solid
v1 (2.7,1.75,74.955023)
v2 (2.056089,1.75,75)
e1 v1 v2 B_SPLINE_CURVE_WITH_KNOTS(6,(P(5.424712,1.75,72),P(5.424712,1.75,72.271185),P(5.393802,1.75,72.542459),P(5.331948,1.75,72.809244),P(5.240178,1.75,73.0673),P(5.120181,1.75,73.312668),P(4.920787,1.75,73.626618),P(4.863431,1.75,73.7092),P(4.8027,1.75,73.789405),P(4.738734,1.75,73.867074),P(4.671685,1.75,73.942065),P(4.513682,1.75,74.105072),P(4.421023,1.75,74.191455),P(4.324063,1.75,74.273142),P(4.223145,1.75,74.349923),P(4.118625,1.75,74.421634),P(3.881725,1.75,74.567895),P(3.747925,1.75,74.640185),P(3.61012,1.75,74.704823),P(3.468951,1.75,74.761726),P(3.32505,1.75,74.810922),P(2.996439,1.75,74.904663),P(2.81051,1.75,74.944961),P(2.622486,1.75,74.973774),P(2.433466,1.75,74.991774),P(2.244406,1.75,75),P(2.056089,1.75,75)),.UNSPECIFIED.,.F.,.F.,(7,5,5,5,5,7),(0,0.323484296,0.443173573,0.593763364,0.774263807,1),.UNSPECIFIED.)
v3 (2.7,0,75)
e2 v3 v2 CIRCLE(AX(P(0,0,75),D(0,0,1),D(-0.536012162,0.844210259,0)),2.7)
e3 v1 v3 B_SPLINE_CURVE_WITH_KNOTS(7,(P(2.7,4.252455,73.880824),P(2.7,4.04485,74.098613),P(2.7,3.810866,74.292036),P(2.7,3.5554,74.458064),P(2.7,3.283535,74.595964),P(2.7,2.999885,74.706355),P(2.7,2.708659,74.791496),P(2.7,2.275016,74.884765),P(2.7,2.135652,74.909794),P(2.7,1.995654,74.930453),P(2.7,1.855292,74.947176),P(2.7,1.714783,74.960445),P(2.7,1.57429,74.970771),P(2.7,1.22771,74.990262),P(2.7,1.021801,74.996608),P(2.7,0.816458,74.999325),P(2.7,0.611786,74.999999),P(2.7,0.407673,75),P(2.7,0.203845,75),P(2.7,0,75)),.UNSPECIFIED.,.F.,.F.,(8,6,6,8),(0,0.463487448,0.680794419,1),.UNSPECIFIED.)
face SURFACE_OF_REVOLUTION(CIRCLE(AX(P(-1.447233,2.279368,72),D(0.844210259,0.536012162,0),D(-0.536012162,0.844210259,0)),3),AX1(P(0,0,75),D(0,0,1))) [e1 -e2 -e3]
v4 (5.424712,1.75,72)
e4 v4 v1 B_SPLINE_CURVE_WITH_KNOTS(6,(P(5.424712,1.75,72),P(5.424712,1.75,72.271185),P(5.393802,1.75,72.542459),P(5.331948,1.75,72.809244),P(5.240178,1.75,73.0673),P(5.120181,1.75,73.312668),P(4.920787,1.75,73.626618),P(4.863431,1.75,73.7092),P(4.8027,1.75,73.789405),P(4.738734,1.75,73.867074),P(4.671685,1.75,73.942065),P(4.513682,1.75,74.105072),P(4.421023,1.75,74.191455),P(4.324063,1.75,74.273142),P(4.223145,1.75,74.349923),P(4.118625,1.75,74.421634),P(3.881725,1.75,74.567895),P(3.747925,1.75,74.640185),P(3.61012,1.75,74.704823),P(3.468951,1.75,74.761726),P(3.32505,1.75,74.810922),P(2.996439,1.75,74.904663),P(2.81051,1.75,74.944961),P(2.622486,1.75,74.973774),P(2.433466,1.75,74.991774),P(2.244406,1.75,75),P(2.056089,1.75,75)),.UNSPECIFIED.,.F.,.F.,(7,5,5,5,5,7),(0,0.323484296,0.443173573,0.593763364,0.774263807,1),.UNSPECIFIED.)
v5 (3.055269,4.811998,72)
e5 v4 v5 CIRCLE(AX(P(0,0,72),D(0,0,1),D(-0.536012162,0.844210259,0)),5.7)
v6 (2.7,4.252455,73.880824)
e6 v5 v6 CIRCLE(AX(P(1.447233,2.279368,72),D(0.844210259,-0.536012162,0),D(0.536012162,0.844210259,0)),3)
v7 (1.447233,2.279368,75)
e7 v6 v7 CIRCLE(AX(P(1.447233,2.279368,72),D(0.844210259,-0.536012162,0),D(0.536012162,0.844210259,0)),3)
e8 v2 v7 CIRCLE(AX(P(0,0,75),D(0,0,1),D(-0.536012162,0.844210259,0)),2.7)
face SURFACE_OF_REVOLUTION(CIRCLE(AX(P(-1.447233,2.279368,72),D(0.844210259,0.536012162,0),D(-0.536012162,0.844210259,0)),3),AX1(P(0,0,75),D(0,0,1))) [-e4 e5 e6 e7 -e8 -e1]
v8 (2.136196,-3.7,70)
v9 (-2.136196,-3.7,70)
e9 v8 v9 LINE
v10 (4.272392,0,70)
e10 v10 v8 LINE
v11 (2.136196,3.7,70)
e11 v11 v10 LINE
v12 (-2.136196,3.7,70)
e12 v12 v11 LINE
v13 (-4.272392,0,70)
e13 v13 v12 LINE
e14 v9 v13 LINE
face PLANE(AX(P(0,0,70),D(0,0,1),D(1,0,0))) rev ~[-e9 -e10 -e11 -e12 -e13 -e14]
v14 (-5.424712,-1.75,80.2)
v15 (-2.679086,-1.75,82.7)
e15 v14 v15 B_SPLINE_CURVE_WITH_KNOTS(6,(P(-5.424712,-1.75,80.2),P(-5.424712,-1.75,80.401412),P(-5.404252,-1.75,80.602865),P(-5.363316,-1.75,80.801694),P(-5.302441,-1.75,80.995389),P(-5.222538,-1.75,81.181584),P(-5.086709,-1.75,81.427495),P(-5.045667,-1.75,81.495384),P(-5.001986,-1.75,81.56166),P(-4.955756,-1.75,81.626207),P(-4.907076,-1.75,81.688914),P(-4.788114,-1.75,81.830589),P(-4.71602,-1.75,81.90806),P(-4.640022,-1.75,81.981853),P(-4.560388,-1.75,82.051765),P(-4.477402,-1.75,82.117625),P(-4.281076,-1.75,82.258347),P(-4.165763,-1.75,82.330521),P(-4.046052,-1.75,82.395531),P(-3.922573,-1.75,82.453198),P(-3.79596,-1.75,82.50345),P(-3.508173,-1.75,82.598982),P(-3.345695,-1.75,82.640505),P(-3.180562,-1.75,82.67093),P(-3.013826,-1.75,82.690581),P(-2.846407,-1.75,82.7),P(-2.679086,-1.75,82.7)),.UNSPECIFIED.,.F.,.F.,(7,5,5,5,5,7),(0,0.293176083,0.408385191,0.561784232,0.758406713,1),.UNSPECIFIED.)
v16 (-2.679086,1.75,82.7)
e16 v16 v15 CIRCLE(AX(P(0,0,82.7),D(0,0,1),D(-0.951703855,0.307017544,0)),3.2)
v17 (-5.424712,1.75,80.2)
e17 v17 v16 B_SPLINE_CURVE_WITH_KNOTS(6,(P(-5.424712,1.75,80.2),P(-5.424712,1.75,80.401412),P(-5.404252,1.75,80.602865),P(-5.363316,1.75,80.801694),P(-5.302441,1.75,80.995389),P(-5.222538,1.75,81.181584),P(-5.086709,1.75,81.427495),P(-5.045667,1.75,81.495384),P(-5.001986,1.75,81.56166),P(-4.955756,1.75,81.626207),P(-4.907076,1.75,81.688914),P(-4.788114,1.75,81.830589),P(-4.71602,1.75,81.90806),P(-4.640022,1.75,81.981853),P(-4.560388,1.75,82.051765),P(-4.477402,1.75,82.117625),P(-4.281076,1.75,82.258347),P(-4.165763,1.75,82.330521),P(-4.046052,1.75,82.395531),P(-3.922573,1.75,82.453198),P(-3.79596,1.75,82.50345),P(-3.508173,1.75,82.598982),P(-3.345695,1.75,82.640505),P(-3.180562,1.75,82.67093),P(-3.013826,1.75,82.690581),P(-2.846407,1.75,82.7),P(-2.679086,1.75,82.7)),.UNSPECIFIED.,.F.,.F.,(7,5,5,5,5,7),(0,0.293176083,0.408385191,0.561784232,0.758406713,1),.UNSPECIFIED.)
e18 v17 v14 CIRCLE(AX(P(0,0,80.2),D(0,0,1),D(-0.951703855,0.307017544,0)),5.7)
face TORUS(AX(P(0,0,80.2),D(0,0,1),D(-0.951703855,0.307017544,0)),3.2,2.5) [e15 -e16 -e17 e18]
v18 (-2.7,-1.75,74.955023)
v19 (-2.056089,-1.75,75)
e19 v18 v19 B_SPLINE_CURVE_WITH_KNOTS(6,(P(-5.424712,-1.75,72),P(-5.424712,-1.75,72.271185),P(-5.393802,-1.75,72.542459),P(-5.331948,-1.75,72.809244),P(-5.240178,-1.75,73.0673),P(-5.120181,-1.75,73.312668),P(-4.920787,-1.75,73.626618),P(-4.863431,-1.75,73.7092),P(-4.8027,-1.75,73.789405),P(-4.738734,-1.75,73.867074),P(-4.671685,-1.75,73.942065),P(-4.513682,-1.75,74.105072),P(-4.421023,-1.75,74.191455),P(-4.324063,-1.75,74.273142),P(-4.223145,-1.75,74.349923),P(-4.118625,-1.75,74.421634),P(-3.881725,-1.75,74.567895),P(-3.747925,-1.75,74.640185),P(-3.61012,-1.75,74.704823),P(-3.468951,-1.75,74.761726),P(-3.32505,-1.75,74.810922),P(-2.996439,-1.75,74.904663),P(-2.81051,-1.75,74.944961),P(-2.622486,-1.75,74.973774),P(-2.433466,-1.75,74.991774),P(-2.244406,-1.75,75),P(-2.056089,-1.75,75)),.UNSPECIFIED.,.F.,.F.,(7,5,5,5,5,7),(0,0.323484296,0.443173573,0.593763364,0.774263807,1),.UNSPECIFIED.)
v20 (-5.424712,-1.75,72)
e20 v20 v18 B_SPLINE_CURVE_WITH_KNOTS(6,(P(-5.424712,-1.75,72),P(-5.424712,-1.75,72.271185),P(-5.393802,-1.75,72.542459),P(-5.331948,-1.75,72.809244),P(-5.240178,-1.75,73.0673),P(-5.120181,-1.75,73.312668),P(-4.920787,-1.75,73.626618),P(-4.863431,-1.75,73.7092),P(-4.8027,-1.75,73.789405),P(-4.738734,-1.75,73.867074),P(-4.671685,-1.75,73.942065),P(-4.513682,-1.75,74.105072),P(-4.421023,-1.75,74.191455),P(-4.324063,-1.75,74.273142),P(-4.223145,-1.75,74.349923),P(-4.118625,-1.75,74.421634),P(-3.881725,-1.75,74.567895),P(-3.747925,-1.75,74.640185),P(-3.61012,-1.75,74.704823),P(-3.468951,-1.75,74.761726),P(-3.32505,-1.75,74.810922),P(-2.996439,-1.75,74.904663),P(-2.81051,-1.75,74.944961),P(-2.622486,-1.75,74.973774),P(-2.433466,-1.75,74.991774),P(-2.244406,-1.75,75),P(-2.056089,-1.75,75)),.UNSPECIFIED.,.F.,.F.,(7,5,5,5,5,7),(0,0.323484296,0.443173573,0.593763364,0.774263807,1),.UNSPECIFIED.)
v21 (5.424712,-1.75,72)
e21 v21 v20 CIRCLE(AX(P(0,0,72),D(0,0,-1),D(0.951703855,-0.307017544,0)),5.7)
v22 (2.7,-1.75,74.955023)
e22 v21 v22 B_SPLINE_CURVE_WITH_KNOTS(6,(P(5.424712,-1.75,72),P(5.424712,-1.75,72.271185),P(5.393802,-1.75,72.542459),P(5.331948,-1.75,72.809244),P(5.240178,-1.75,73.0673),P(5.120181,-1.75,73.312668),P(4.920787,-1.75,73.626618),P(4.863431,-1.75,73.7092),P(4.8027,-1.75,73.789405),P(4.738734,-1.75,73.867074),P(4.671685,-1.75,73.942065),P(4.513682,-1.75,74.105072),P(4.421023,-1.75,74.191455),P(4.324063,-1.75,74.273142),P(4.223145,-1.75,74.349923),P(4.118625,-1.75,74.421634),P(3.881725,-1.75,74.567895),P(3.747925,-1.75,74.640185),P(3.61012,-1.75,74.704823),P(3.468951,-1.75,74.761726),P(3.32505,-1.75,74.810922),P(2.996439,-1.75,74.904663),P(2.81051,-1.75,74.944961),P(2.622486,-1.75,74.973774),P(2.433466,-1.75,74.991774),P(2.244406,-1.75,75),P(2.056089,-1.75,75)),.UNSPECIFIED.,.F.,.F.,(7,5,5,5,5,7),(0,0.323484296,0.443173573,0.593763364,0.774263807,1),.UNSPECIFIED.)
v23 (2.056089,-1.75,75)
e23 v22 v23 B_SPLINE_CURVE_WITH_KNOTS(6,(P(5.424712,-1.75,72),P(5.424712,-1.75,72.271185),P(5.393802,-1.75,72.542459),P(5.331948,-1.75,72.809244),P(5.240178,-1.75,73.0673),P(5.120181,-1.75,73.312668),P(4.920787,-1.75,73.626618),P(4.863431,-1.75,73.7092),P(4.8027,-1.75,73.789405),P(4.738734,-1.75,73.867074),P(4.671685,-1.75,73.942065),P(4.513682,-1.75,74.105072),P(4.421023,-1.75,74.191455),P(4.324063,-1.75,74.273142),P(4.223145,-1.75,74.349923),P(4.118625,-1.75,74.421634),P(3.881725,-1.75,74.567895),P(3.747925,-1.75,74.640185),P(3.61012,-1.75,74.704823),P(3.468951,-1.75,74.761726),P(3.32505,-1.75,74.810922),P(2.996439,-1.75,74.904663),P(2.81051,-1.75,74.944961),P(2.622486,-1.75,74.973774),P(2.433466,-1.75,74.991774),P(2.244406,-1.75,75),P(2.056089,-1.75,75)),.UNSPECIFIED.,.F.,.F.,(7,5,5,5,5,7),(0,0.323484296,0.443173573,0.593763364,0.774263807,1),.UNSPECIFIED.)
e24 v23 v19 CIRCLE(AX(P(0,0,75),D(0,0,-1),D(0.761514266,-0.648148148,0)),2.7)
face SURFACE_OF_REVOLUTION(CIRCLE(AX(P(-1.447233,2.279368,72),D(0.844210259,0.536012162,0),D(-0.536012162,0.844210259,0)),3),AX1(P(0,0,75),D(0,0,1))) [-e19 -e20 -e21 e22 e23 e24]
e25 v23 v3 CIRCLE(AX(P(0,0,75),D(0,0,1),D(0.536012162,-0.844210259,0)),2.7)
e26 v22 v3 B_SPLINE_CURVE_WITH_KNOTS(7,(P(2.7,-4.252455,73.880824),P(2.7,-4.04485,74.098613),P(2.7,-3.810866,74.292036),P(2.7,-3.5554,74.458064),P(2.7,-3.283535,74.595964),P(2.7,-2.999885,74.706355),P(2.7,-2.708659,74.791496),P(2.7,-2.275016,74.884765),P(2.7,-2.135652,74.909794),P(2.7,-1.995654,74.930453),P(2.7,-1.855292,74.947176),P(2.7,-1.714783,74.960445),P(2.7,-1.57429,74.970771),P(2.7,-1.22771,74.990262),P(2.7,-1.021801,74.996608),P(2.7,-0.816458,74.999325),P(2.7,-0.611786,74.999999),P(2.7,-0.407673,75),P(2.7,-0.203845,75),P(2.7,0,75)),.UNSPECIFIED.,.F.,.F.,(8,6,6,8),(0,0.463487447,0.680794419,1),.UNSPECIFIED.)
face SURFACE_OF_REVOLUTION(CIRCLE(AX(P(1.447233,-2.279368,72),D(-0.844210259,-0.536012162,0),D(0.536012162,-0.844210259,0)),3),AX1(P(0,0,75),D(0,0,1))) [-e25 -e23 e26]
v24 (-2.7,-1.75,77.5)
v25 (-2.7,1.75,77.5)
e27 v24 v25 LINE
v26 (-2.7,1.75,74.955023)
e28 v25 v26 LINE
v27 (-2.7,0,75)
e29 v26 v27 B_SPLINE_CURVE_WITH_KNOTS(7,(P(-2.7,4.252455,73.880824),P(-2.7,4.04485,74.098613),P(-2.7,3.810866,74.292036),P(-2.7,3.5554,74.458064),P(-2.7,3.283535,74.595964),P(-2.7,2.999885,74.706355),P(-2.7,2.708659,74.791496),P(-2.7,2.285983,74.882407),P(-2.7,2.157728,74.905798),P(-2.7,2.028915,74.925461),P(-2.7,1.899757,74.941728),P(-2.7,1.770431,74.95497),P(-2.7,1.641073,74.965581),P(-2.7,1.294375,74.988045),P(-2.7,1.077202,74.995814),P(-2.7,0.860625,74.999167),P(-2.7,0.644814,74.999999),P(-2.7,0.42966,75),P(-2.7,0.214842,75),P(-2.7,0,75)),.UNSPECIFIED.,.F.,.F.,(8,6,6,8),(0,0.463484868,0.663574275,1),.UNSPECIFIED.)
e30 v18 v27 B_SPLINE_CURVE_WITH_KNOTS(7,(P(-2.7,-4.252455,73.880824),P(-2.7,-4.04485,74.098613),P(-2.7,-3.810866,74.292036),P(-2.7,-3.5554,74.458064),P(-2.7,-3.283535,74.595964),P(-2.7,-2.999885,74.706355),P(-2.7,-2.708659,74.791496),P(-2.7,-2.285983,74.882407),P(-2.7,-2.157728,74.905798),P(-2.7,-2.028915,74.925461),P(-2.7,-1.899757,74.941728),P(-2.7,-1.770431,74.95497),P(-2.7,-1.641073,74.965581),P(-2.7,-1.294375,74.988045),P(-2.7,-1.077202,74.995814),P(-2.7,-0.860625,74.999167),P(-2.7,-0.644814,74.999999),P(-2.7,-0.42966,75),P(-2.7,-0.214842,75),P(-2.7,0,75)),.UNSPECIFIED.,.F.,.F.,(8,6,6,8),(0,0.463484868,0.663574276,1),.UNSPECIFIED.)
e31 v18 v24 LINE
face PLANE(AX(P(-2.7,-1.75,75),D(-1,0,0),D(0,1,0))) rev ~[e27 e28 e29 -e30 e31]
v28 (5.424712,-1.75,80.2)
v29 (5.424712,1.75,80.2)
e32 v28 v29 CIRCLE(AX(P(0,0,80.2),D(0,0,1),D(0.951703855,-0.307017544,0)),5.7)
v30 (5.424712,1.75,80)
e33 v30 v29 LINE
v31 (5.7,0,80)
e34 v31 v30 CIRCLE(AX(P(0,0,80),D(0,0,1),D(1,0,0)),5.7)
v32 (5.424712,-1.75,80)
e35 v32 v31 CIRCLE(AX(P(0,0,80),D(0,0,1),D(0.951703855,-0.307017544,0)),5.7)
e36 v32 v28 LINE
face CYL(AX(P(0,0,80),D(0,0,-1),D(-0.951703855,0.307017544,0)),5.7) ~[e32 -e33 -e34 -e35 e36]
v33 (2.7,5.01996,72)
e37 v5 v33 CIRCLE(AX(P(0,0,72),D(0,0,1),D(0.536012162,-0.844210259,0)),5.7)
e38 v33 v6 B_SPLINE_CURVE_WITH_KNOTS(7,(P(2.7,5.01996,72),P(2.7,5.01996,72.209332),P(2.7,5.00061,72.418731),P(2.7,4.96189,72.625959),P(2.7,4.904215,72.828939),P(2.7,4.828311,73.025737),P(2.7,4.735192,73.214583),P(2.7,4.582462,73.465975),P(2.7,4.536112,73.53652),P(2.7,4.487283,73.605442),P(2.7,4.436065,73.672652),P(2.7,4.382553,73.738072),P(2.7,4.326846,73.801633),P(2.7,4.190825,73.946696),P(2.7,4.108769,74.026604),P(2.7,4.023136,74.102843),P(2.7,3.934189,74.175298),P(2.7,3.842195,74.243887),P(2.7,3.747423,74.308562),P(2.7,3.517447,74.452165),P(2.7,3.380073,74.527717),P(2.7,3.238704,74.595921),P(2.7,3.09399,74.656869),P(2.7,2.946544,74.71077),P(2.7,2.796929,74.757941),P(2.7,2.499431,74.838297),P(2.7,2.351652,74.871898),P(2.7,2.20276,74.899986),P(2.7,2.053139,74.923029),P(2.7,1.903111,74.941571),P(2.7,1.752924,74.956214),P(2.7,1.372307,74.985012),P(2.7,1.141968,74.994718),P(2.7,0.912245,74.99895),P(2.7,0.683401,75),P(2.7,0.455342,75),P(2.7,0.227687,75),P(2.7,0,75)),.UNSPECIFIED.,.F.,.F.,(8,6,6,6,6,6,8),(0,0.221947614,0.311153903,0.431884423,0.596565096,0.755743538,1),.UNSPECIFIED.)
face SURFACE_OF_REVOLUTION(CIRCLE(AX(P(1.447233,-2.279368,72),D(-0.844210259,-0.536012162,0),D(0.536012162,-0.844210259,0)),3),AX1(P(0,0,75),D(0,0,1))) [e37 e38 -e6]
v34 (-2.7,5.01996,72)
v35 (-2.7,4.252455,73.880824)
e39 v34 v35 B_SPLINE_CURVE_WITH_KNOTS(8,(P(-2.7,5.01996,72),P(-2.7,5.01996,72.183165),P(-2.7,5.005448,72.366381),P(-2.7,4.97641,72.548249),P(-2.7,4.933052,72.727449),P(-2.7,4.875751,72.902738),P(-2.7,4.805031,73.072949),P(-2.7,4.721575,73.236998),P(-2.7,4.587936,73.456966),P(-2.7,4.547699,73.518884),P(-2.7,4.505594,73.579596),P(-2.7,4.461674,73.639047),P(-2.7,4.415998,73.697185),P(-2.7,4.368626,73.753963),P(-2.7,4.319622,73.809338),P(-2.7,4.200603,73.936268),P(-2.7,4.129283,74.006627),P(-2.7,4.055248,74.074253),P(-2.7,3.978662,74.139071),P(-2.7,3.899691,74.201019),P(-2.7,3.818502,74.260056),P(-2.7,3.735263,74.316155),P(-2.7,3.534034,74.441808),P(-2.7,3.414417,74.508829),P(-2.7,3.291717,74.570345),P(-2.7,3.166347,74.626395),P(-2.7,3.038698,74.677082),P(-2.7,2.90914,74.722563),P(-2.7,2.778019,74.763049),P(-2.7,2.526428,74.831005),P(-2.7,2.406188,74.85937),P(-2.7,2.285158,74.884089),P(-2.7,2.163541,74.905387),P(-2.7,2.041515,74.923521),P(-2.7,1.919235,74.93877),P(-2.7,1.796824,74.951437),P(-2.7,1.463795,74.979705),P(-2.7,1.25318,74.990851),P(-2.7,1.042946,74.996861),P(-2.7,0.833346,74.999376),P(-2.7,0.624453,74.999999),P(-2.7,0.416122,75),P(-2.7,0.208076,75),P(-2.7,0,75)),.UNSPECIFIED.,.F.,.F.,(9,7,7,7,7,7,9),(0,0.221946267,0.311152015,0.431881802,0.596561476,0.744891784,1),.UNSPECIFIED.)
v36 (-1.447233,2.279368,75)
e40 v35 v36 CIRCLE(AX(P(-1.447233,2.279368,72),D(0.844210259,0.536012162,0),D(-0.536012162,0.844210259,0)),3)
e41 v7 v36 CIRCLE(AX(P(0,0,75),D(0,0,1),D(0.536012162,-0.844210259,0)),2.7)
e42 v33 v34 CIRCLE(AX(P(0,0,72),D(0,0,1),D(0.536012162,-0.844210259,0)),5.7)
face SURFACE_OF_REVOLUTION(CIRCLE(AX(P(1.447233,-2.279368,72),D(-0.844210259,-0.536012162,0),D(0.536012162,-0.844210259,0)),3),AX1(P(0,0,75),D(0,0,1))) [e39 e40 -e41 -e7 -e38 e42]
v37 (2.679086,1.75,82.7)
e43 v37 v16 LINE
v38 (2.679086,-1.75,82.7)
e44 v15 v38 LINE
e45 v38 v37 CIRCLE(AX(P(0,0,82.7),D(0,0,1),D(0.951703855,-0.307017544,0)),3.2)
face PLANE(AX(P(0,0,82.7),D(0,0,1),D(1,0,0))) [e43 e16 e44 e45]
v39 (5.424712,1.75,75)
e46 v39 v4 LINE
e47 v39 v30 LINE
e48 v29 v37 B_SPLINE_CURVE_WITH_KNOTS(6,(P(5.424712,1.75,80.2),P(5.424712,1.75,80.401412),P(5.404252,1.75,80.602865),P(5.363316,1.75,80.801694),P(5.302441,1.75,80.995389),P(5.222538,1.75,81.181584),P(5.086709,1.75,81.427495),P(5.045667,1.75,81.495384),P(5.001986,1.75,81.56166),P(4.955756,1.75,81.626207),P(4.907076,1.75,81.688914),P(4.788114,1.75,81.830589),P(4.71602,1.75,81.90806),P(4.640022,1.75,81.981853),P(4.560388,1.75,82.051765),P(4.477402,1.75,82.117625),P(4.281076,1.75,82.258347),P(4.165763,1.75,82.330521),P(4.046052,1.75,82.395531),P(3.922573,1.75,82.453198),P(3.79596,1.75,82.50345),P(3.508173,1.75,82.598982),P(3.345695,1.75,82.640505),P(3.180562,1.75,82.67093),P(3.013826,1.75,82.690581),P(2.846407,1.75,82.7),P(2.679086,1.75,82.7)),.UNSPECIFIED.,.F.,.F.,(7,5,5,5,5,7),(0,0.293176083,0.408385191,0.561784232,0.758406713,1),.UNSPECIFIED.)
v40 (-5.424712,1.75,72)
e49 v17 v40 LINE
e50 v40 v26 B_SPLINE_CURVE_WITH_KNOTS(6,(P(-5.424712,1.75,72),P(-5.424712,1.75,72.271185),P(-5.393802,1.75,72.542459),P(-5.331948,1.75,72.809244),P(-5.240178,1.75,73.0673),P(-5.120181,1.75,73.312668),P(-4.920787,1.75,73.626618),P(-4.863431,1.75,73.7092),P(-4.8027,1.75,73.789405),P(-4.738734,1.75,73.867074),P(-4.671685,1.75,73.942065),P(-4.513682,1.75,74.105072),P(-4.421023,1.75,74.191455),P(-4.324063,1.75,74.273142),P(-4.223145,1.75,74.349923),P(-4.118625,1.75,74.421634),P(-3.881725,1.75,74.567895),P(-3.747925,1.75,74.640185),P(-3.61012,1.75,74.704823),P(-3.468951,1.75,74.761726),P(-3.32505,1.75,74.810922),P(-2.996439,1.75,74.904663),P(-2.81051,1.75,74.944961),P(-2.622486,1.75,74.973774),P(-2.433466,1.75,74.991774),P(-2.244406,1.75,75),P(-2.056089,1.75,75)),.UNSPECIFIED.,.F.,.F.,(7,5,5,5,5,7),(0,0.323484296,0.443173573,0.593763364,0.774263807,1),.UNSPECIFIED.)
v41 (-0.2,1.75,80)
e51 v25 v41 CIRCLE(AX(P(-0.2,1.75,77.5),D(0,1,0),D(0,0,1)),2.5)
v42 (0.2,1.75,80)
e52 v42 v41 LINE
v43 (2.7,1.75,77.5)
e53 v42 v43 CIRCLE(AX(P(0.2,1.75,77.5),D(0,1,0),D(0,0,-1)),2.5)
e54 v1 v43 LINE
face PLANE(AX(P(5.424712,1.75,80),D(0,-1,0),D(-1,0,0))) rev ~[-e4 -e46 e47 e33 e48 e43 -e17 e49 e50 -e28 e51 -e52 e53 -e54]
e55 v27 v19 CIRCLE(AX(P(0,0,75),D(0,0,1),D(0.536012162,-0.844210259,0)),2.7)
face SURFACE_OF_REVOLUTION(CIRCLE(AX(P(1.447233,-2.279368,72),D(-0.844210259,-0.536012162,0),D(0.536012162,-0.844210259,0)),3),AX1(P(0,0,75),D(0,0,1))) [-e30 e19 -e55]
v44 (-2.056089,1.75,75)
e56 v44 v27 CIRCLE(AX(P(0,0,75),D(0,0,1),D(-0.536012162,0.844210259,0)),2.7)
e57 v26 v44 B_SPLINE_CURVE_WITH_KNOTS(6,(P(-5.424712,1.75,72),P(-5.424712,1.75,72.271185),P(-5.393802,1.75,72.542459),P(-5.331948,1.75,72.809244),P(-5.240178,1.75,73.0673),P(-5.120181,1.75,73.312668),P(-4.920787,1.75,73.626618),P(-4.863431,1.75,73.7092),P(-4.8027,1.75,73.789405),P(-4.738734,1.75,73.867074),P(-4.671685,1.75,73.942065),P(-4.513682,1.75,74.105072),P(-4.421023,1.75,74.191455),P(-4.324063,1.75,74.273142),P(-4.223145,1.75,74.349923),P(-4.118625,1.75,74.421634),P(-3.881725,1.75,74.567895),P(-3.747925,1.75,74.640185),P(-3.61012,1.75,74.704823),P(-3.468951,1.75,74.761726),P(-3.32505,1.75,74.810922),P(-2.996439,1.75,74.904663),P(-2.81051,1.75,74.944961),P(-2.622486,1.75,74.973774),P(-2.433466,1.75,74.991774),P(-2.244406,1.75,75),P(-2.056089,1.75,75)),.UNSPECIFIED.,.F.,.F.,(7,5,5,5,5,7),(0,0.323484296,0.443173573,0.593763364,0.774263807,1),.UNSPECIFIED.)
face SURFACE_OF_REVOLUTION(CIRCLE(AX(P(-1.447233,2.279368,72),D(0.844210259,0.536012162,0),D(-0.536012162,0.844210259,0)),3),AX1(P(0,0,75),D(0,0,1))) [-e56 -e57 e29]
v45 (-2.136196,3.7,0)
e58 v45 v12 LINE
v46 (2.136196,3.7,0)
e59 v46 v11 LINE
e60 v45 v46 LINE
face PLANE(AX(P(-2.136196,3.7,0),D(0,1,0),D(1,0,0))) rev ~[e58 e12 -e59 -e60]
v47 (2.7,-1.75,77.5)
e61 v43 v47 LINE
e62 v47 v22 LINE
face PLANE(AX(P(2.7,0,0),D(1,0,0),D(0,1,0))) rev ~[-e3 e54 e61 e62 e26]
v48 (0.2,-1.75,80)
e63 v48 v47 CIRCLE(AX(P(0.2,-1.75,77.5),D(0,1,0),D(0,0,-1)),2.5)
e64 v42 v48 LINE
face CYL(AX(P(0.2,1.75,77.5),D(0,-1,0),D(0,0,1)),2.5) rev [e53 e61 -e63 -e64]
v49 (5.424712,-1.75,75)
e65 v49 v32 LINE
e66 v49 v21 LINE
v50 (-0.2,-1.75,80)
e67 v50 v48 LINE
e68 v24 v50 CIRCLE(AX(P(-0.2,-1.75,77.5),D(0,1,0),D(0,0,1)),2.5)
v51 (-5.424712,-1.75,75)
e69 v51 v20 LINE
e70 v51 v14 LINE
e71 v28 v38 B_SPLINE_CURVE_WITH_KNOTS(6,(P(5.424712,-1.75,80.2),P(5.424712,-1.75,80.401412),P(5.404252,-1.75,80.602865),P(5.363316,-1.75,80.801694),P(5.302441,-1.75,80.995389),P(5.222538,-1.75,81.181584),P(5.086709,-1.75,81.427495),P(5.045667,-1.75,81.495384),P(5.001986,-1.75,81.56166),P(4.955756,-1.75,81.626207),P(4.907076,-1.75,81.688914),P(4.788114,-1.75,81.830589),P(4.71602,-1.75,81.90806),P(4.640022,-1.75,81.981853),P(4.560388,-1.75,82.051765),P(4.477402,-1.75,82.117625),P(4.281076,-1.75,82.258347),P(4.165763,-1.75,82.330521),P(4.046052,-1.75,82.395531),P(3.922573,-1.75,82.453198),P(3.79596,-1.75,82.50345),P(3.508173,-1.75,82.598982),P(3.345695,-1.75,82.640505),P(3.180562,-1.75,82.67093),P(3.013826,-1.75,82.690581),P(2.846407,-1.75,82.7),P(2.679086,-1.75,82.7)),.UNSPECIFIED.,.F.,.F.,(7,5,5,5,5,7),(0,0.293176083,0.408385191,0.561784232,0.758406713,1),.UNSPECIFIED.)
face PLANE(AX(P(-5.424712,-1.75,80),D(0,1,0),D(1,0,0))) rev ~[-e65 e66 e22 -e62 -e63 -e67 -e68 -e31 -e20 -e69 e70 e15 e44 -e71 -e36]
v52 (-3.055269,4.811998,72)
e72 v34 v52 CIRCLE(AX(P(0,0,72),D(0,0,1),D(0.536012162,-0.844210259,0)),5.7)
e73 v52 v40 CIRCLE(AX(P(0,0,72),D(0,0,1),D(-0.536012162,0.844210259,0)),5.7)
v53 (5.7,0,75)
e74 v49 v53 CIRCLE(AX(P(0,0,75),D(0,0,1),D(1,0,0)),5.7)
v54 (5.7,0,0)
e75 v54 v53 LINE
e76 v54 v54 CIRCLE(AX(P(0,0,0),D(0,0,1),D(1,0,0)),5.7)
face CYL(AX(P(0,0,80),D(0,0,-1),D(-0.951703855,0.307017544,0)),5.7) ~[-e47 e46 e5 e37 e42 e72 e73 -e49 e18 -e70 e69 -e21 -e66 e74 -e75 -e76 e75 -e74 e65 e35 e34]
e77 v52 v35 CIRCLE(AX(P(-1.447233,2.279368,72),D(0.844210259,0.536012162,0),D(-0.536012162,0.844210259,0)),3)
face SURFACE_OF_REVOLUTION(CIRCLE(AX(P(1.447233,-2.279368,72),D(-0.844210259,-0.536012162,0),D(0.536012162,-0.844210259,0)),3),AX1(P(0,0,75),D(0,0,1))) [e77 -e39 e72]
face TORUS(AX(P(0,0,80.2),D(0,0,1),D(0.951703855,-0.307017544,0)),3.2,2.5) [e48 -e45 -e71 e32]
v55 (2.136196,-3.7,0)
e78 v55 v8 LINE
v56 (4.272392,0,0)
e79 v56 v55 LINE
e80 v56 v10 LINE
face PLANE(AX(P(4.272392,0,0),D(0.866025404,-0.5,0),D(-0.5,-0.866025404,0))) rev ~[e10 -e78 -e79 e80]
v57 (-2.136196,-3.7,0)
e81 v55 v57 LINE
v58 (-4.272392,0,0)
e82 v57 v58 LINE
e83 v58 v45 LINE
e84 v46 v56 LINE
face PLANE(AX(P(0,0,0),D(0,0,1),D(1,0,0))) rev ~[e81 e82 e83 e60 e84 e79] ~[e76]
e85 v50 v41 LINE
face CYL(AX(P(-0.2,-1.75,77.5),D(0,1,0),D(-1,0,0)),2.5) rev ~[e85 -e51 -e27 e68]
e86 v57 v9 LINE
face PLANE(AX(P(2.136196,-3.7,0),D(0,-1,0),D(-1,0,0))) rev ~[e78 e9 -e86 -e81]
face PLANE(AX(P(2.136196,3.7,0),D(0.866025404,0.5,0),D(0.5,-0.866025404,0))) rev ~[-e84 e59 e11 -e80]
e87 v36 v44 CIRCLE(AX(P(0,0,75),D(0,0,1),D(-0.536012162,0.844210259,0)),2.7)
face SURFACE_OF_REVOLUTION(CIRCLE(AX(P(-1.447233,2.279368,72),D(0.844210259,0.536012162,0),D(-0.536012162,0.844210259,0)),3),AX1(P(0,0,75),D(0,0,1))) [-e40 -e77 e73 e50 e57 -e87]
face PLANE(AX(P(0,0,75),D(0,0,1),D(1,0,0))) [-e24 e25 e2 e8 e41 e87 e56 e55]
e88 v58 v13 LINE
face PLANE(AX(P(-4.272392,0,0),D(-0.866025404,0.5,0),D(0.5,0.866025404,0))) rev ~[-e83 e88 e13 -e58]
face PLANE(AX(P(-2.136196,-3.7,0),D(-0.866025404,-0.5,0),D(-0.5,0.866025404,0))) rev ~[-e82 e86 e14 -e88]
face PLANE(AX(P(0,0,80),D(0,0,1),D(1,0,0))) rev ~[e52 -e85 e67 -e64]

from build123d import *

# Parameters (mm, degrees)
F0_R         = 5.7
F1_DEPTH     = 70
F2_R         = 5.7
F3_DEPTH     = 5
F5_DEPTH     = 5
F6_W         = 5.4
F6_H         = 3.5
F7_DEPTH     = 2.7
F8_R         = 2.5
F9_T4_ANGLE  = 295.1748403761
F9_T9_ANGLE  = 295.1748403761
F9_T15_ANGLE = 295.1748403761
F9_T20_ANGLE = 295.1748403761
F9_T25_ANGLE = 295.1748403761
F9_T31_ANGLE = 295.1748403761


# Not quite as in the source:
# - a fillet or chamfer that OpenCascade refuses, or shapes differently, is made with other operations: its cross-section is extruded or revolved along the edge and cut away or added


with BuildPart() as f1:
    # F0 (on Top) → F1 (new body)
    with BuildSketch(Plane.XY):
        Circle(F0_R)
        Polygon((-2.136195996, -3.7), (-4.272391992, 0), (-2.136195996, 3.7), (2.136195996, 3.7), (4.272391992, 0), (2.136195996, -3.7), align=None, mode=Mode.SUBTRACT)
    extrude(amount=F1_DEPTH)

    # F2 (on face) → F3 (join)
    with BuildSketch(Plane.XY.offset(70)):
        Circle(F2_R)
        Polygon((2.136195996, -3.7), (-2.136195996, -3.7), (-4.272391992, 0), (-2.136195996, 3.7), (2.136195996, 3.7), (4.272391992, 0), align=None, mode=Mode.SUBTRACT)
        Polygon((-4.272391992, 0), (-2.136195996, -3.7), (2.136195996, -3.7), (4.272391992, 0), (2.136195996, 3.7), (-2.136195996, 3.7), align=None)
    extrude(amount=F3_DEPTH)

    # F4 (on face) → F5 (join)
    with BuildSketch(Plane.XY.offset(75)):
        with BuildLine():
            Line((-5.4247119739, -1.75), (-2.7, -1.75))
            Line((-2.7, -1.75), (-2.7, 1.75))
            Line((-2.7, 1.75), (-5.4247119739, 1.75))
            ThreePointArc((-5.4247119739, 1.75), (-5.7, 0), (-5.4247119739, -1.75))
        make_face()
        with BuildLine():
            Line((2.7, -1.75), (5.4247119739, -1.75))
            ThreePointArc((5.4247119739, -1.75), (5.6307574202, -0.8857600546), (5.7, 0))
            ThreePointArc((5.7, 0), (5.6307574202, 0.8857600546), (5.4247119739, 1.75))
            Line((5.4247119739, 1.75), (2.7, 1.75))
            Line((2.7, 1.75), (2.7, -1.75))
        make_face()
    extrude(amount=F5_DEPTH)

    # F6 (on face) → F7 (join)
    with BuildSketch(Plane.XY.offset(80)):
        Rectangle(F6_W, F6_H)
        with BuildLine():
            Line((-2.7, -1.75), (-2.7, 1.75))
            Line((-2.7, 1.75), (-5.4247119739, 1.75))
            ThreePointArc((-5.4247119739, 1.75), (-5.7, 0), (-5.4247119739, -1.75))
            Line((-5.4247119739, -1.75), (-2.7, -1.75))
        make_face()
        with BuildLine():
            Line((5.4247119739, 1.75), (2.7, 1.75))
            Line((2.7, 1.75), (2.7, -1.75))
            Line((2.7, -1.75), (5.4247119739, -1.75))
            ThreePointArc((5.4247119739, -1.75), (5.7, 0), (5.4247119739, 1.75))
        make_face()
    extrude(amount=F7_DEPTH)

    # F8
    f8_edges = [f1.edges().sort_by_distance(p)[0] for p in [
        (-5.7, 0, 82.7),
        (2.7, 0, 80),
        (-2.7, 0, 80),
        (5.7, 0, 82.7),
    ]]
    fillet(f8_edges, radius=F8_R)

    # F9: fillet of radius 3 on 3 edges, made by hand


with BuildPart() as f9_tool2:
    # F9_s3 → F9_t4 (revolve)
    with BuildSketch(Plane(origin=(0, 0, 0), x_dir=(0, 0, 1), z_dir=(0.8442102595, 0.536012162, 0))):
        with BuildLine():
            ThreePointArc((72, -5.7), (74.1213203436, -4.8213203436), (75, -2.7))
            Line((75, -2.7), (75, -5.7))
            Line((75, -5.7), (72, -5.7))
        make_face()
    revolve(axis=Axis((0, 0, 75), (0, 0, 1)), revolution_arc=F9_T4_ANGLE)

    split(bisect_by=Plane.XZ.offset(-1.75), keep=Keep.BOTTOM)


with BuildPart() as f1_1:
    add(f1.part)

    # F9_t1: cut F9_tool2
    add(f9_tool2.part, mode=Mode.SUBTRACT)


with BuildPart() as f9_tool7:
    # F9_s8 → F9_t9 (revolve)
    with BuildSketch(Plane(origin=(0, 0, 0), x_dir=(0, 0, 1), z_dir=(0.8442102595, 0.536012162, 0))):
        with BuildLine():
            ThreePointArc((72, -5.7), (74.1213203436, -4.8213203436), (75, -2.7))
            Line((75, -2.7), (75, -5.7))
            Line((75, -5.7), (72, -5.7))
        make_face()
    revolve(axis=Axis((0, 0, 75), (0, 0, 1)), revolution_arc=F9_T9_ANGLE)

    split(bisect_by=Plane.YZ.offset(-2.7), keep=Keep.TOP)

    split(bisect_by=Plane.YZ.offset(2.7), keep=Keep.BOTTOM)


with BuildPart() as f1_2:
    add(f1_1.part)

    # F9_t6: cut F9_tool7
    add(f9_tool7.part, mode=Mode.SUBTRACT)


with BuildPart() as f9_tool13:
    # F9_s14 → F9_t15 (revolve)
    with BuildSketch(Plane(origin=(0, 0, 0), x_dir=(0, 0, 1), z_dir=(0.8442102595, 0.536012162, 0))):
        with BuildLine():
            ThreePointArc((72, -5.7), (74.1213203436, -4.8213203436), (75, -2.7))
            Line((75, -2.7), (75, -5.7))
            Line((75, -5.7), (72, -5.7))
        make_face()
    revolve(axis=Axis((0, 0, 75), (0, 0, 1)), revolution_arc=F9_T15_ANGLE)

    split(bisect_by=Plane.XZ.offset(1.75), keep=Keep.TOP)


with BuildPart() as f1_3:
    add(f1_2.part)

    # F9_t12: cut F9_tool13
    add(f9_tool13.part, mode=Mode.SUBTRACT)


with BuildPart() as f9_tool18:
    # F9_s19 → F9_t20 (revolve)
    with BuildSketch(Plane(origin=(0, 0, 0), x_dir=(0, 0, 1), z_dir=(-0.8442102595, -0.536012162, 0))):
        with BuildLine():
            ThreePointArc((72, -5.7), (74.1213203436, -4.8213203436), (75, -2.7))
            Line((75, -2.7), (75, -5.7))
            Line((75, -5.7), (72, -5.7))
        make_face()
    revolve(axis=Axis((0, 0, 75), (0, 0, 1)), revolution_arc=F9_T20_ANGLE)

    split(bisect_by=Plane.XZ.offset(1.75), keep=Keep.TOP)


with BuildPart() as f1_4:
    add(f1_3.part)

    # F9_t17: cut F9_tool18
    add(f9_tool18.part, mode=Mode.SUBTRACT)


with BuildPart() as f9_tool23:
    # F9_s24 → F9_t25 (revolve)
    with BuildSketch(Plane(origin=(0, 0, 0), x_dir=(0, 0, 1), z_dir=(-0.8442102595, -0.536012162, 0))):
        with BuildLine():
            ThreePointArc((72, -5.7), (74.1213203436, -4.8213203436), (75, -2.7))
            Line((75, -2.7), (75, -5.7))
            Line((75, -5.7), (72, -5.7))
        make_face()
    revolve(axis=Axis((0, 0, 75), (0, 0, 1)), revolution_arc=F9_T25_ANGLE)

    split(bisect_by=Plane.YZ.offset(-2.7), keep=Keep.TOP)

    split(bisect_by=Plane.YZ.offset(2.7), keep=Keep.BOTTOM)


with BuildPart() as f1_5:
    add(f1_4.part)

    # F9_t22: cut F9_tool23
    add(f9_tool23.part, mode=Mode.SUBTRACT)


with BuildPart() as f9_tool29:
    # F9_s30 → F9_t31 (revolve)
    with BuildSketch(Plane(origin=(0, 0, 0), x_dir=(0, 0, 1), z_dir=(-0.8442102595, -0.536012162, 0))):
        with BuildLine():
            ThreePointArc((72, -5.7), (74.1213203436, -4.8213203436), (75, -2.7))
            Line((75, -2.7), (75, -5.7))
            Line((75, -5.7), (72, -5.7))
        make_face()
    revolve(axis=Axis((0, 0, 75), (0, 0, 1)), revolution_arc=F9_T31_ANGLE)

    split(bisect_by=Plane.XZ.offset(-1.75), keep=Keep.BOTTOM)


with BuildPart() as f1_6:
    add(f1_5.part)

    # F9_t28: cut F9_tool29
    add(f9_tool29.part, mode=Mode.SUBTRACT)


solid = f1_6.part
